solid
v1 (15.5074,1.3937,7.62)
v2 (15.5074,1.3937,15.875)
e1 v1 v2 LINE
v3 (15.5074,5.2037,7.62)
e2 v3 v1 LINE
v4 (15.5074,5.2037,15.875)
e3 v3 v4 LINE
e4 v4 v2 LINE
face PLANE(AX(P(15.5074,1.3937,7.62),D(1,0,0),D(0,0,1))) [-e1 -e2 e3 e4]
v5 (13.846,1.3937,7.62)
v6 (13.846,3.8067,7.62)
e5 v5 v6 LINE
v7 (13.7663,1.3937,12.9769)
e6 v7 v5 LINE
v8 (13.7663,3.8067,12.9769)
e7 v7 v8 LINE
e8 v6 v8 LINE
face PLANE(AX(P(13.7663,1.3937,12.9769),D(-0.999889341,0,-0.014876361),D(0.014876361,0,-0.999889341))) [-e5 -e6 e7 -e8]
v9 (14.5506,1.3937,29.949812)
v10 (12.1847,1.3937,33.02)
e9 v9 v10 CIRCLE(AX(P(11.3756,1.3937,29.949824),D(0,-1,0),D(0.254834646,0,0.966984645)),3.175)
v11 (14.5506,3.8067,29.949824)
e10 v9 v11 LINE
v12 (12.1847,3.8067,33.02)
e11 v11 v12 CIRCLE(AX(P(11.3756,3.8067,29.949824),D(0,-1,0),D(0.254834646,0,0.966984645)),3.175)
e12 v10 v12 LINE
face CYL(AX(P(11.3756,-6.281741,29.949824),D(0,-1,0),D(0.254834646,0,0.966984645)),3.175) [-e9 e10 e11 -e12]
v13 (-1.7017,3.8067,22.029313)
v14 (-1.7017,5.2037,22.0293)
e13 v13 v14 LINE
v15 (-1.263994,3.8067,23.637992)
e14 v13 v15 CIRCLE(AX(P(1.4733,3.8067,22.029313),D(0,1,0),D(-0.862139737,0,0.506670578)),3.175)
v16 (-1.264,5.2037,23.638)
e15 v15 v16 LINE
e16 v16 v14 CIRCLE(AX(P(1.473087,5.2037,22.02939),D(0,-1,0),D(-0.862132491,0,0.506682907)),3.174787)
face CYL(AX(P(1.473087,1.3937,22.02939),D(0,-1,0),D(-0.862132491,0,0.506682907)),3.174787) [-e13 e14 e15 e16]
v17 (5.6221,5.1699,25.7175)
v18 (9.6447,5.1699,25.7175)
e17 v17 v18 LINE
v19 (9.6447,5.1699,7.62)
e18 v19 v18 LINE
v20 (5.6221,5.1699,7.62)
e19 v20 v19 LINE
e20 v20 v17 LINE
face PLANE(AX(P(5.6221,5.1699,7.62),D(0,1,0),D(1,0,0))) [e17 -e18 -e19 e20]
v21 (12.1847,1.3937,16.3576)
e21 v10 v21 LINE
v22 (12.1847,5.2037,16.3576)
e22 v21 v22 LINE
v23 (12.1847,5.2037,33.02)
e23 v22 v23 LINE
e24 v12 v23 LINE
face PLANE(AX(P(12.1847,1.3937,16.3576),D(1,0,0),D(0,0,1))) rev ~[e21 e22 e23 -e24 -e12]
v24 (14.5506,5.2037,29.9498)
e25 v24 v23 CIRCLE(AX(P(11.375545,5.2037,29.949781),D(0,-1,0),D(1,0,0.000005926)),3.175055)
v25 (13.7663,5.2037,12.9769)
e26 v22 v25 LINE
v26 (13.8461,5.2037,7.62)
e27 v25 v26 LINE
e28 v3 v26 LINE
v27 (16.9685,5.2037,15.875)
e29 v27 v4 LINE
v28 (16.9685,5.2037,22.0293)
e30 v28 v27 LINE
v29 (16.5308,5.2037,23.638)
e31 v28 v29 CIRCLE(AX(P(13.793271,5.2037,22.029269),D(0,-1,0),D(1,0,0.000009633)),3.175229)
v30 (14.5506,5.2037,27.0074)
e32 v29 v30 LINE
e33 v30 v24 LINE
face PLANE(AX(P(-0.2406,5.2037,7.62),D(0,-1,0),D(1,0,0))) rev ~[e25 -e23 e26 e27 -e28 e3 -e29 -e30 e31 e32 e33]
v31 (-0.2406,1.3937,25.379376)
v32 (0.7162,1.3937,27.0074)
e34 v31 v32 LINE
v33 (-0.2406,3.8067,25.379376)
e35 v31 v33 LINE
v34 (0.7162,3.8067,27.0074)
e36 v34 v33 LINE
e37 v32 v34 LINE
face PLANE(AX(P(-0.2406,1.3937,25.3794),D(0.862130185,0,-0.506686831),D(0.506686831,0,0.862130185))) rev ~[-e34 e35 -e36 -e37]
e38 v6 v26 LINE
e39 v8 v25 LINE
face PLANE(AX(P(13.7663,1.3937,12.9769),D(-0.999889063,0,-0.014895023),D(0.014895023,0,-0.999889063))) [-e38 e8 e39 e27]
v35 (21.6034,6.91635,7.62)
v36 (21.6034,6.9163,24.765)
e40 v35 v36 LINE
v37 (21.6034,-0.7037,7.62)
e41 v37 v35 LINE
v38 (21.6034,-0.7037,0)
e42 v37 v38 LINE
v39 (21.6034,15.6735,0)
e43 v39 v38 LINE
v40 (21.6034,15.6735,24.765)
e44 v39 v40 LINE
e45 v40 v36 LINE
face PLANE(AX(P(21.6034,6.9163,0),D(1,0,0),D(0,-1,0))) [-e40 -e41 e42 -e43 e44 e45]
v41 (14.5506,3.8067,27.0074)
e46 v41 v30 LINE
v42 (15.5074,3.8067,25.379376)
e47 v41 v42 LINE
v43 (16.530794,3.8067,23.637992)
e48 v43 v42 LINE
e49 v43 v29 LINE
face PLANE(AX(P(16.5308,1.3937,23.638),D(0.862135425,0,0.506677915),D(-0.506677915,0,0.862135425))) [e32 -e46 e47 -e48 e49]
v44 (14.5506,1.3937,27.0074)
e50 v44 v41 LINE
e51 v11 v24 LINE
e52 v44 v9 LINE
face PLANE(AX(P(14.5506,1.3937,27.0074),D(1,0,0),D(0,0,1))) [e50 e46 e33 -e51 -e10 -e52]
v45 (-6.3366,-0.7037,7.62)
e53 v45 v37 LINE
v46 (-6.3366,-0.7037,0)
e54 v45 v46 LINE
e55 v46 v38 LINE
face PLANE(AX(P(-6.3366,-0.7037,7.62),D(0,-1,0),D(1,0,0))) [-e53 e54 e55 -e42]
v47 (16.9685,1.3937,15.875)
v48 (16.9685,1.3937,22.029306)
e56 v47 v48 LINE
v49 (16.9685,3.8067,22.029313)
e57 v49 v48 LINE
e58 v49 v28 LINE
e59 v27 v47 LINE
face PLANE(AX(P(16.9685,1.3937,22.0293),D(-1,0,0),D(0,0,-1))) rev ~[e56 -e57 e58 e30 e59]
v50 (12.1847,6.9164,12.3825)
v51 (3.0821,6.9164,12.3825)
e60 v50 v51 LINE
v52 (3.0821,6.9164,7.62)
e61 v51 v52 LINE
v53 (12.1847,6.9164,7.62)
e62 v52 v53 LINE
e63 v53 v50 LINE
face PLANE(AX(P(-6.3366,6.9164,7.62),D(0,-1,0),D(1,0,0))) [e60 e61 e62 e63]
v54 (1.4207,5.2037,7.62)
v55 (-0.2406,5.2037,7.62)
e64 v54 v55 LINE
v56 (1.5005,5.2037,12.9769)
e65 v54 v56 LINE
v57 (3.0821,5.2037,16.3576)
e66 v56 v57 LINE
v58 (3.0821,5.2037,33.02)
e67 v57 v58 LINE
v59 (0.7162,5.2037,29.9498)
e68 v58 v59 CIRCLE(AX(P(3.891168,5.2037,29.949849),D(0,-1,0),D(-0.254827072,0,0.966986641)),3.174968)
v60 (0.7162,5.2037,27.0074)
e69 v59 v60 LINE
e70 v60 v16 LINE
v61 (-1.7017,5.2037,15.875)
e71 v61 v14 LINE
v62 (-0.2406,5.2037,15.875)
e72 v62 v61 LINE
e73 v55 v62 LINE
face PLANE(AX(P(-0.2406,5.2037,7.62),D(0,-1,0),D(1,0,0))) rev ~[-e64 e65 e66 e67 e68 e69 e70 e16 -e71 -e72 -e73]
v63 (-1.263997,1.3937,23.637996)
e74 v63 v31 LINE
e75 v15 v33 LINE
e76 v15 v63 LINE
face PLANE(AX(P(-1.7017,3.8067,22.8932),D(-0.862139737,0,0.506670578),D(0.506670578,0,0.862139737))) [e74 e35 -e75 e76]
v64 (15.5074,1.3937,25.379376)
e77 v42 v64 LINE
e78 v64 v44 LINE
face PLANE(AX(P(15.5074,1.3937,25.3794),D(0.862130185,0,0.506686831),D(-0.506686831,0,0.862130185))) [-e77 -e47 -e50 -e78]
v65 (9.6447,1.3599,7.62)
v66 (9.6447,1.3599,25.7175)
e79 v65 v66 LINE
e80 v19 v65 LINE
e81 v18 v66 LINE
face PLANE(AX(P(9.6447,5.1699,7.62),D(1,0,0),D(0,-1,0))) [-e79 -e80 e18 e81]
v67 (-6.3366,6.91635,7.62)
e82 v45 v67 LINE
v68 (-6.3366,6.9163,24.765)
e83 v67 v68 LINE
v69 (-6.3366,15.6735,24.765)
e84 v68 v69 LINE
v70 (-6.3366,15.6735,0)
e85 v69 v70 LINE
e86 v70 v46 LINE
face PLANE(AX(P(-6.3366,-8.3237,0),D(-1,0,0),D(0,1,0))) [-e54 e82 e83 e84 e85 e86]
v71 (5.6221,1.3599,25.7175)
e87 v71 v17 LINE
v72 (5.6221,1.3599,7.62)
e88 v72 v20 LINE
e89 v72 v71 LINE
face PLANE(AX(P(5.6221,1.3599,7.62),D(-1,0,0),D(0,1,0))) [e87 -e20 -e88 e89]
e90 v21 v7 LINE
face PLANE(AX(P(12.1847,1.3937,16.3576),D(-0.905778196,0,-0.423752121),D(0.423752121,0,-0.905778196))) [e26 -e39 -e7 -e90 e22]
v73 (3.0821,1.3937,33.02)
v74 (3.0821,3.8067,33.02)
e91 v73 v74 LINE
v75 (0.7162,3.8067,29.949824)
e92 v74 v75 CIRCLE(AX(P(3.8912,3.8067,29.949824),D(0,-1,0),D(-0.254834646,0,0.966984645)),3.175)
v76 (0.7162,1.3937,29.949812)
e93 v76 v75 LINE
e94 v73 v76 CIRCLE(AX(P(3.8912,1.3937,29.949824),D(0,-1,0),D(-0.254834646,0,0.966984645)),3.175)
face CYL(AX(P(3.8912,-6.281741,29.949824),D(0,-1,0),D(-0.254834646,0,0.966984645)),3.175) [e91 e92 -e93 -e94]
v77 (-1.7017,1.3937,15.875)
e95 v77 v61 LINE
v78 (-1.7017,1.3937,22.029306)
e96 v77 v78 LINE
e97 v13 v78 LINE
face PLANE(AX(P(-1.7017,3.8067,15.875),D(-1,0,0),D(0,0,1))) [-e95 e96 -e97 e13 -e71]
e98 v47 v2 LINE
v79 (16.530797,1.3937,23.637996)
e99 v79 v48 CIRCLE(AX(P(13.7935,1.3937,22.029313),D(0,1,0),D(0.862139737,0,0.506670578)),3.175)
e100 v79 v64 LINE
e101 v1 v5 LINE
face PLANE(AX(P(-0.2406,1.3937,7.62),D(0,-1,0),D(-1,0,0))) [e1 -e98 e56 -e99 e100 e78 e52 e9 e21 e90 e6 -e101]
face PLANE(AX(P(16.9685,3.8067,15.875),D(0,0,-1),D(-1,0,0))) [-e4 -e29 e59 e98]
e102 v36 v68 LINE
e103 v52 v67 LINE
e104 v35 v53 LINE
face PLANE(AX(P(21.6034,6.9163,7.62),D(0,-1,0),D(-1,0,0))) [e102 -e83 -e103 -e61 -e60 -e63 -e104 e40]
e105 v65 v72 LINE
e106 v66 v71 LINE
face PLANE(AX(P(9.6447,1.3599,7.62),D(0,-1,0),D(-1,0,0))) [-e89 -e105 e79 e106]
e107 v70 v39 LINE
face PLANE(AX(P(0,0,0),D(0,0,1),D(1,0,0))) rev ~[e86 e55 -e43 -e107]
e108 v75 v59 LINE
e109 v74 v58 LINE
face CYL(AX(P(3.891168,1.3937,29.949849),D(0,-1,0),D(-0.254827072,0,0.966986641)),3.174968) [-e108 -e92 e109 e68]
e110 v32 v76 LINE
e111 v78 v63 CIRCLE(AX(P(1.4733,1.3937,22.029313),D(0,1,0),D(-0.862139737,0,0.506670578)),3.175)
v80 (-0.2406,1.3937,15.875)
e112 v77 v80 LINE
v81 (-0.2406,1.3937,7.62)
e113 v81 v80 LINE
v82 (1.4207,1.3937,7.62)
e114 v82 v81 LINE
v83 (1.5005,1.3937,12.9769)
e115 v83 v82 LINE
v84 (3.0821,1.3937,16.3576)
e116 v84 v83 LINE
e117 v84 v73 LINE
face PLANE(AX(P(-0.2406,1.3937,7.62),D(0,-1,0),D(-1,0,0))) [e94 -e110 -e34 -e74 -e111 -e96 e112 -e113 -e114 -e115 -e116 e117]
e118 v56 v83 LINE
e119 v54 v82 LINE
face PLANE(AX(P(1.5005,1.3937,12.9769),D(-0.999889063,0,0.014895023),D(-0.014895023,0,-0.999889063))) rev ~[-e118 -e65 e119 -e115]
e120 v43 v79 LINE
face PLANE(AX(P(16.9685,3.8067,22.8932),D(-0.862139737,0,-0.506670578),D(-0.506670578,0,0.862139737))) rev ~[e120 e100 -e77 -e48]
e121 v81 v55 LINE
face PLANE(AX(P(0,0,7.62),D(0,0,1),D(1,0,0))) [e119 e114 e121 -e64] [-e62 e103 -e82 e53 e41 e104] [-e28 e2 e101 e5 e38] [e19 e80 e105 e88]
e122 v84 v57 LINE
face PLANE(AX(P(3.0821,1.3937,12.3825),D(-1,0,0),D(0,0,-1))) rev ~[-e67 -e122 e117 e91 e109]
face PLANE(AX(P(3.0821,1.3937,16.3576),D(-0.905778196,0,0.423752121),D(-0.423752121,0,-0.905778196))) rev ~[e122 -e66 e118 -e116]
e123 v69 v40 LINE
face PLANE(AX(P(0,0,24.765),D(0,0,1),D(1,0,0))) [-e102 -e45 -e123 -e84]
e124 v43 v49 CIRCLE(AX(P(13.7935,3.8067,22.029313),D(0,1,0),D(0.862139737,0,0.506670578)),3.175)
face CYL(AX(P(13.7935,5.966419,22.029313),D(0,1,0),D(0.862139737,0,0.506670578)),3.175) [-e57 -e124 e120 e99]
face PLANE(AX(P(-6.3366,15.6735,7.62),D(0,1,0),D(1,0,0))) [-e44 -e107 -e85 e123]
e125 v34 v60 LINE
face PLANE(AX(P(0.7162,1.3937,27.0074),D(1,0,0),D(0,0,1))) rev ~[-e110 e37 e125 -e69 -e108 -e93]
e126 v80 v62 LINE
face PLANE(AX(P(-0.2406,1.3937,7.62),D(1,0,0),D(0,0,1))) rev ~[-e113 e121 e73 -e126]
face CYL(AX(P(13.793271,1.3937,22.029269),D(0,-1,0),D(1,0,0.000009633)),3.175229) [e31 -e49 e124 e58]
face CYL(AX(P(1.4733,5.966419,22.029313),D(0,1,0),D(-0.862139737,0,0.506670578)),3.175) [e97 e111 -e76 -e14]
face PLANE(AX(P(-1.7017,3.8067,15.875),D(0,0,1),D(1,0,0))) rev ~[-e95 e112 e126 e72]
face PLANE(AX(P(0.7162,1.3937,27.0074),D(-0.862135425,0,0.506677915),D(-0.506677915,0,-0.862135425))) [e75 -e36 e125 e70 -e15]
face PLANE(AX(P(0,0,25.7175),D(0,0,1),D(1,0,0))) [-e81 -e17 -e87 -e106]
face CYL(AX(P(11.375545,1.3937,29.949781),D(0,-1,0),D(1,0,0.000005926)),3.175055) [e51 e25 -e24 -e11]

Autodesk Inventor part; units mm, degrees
ref_plane "YZ Plane" through (0, 0, 0) normal (1, 0, 0) x (0, 1, 0)
ref_plane "XZ Plane" through (0, 0, 0) normal (0, 1, 0) x (-1, 0, 0)
ref_plane "XY Plane" through (0, 0, 0) normal (0, 0, 1) x (1, 0, 0)
sketch "Sketch1" plane through (0, 0, 0) normal (0, 0, 1) x (1, 0, 0)
  line L0 (-6.3366, 6.9163) -> (21.6034, 6.9163)
  line L1 (21.6034, 6.9163) -> (21.6034, -8.3237)
  line L2 (21.6034, -8.3237) -> (-6.3366, -8.3237)
  line L3 (-6.3366, -8.3237) -> (-6.3366, 6.9163)
  point P0 (0, 0)
  dimension "d0" = 27.94
  dimension "d1" = 15.24
extrude "Extrusion1" add sketch "Sketch1" along normal blind 7.62
sketch "Sketch2" plane through (0, 0, 7.62) normal (0, 0, 1) x (1, 0, 0)
  line L0 (-6.3366, 6.9163) -> (-6.3366, -8.3237) projected
  line L1 (21.6034, -8.3237) -> (21.6034, 6.9163) projected
  line L2 (21.6034, 1.3937) -> (21.6034, 3.8067)
  line L3 (-6.3366, 3.8067) -> (-6.3366, 1.3937)
  line L4 (21.6034, 6.9163) -> (-6.3366, 6.9163) projected
  line L5 (-6.3366, -8.3237) -> (21.6034, -8.3237) projected
  line L6 (0.9631, 3.8067) -> (-0.2406, 3.8067)
  line L7 (-0.2406, 1.3937) -> (0.9631, 1.3937)
  line L8 (-0.2406, 1.3937) -> (-0.2406, 3.8067)
  line L9 (-0.2406, 1.3937) -> (3.0821, 1.3937)
  line L10 (3.0821, 1.3937) -> (3.0821, 3.8067)
  line L11 (3.0821, 3.8067) -> (-0.2406, 3.8067)
  line L12 (-0.2406, 3.8067) -> (-0.2406, 1.3937)
  line L13 (14.3038, 3.8067) -> (15.5074, 3.8067)
  line L14 (15.5074, 1.3937) -> (14.3038, 1.3937)
  line L15 (15.5074, 1.3937) -> (15.5074, 3.8067)
  line L16 (15.5074, 1.3937) -> (12.1847, 1.3937)
  line L17 (12.1847, 1.3937) -> (12.1847, 3.8067)
  line L18 (12.1847, 3.8067) -> (15.5074, 3.8067)
  line L19 (15.5074, 3.8067) -> (15.5074, 1.3937)
  line L20 (-6.3366, -0.7037) -> (21.6034, -0.7037)
  line L21 (-6.3366, 3.8067) -> (21.6034, 3.8067)
  line L22 (21.6034, 3.8067) -> (21.6034, 1.3937)
  line L23 (21.6034, 1.3937) -> (-6.3366, 1.3937)
  line L24 (-6.3366, 1.3937) -> (-6.3366, 3.8067)
  point P0 (0, 0)
  point P1 (-0.2406, 2.6002)
  point P2 (15.2669, 1.0813)
  point P3 (15.5074, 2.6002)
  point P4 (15.5074, 1.3937)
  point P5 (21.6034, 3.8067)
  point P6 (15.5074, 3.8067)
  point P7 (-0.2406, 1.3937)
  point P8 (-0.2406, 3.8067)
  point P9 (-6.3366, 3.8067)
  point P10 (3.0821, 1.3937)
  point P11 (12.1847, 1.3937)
  point P12 (12.1847, 3.8067)
  point P13 (3.0821, 3.8067)
  dimension "d6" = 6.096
extrude "Extrusion2" add sketch "Sketch2" along normal blind 8.7376 contours L6 L11 L10 L9 L7 L8 | L15 L14 L16 L17 L18 L13
sketch "Sketch3" plane through (-0.2406, 3.8067, 7.62) normal (0, 1, 0) x (1, 0, 0)
  line L0 (3.3227, -8.7376) -> (0, -8.7376) projected
  line L1 (-6.096, 7.62) -> (21.844, 7.62) projected
  line L2 (3.3227, -11.3552) -> (3.3227, -8.7376)
  line L3 (12.4253, -11.3552) -> (12.4253, -8.7376)
  line L4 (17.2091, -8.255) -> (17.2091, -15.2732)
  line L5 (17.2091, -15.2732) -> (14.9854, -19.057)
  line L6 (14.9854, -19.057) -> (12.4253, -19.057)
  line L7 (12.4253, -19.057) -> (12.4253, -8.7376)
  line L8 (7.874, 7.62) -> (7.874, -24.8322)
  line L9 (3.3227, -11.3552) -> (3.3227, -8.7376)
  line L10 (-1.4611, -8.255) -> (-1.4611, -15.2732)
  line L11 (-1.4611, -15.2732) -> (0.7626, -19.057)
  line L12 (0.7626, -19.057) -> (3.3227, -19.057)
  line L13 (3.3227, -19.057) -> (3.3227, -8.7376)
  line L14 (17.2091, -8.255) -> (12.4253, -8.255)
  line L15 (12.4253, 0) -> (12.4253, -8.7376) projected
  line L16 (12.4253, -8.255) -> (12.4253, -8.7376)
  line L17 (-1.4611, -8.255) -> (3.3227, -8.255)
  line L18 (3.3227, 0) -> (3.3227, -8.7376) projected
  line L19 (3.3227, -8.255) -> (3.3227, -8.7376)
  point P0 (0.2406, 7.62)
extrude "Extrusion4" add sketch "Sketch2" along normal blind 25.4 contours L6 L11 L10 L9 L7 L8 | L15 L14 L16 L17 L18 L13
sketch "Sketch4" plane through (-6.3366, 6.9163, 0) normal (0, 1, 0) x (1, 0, 0)
  point P0 (6.3366, 0)
sketch "Sketch5" plane through (0, 0, 7.62) normal (0, 0, 1) x (1, 0, 0)
  line L0 (21.6034, 6.9163) -> (-6.3366, 6.9163) projected
  line L1 (-6.3366, 15.6735) -> (21.6034, 15.6735)
  line L2 (21.6034, 15.6735) -> (21.6034, 6.9163)
  line L3 (21.6034, 6.9163) -> (-6.3366, 6.9163)
  line L4 (-6.3366, 6.9163) -> (-6.3366, 15.6735)
  point P0 (0, 0)
extrude "Extrusion5" add sketch "Sketch5" along normal blind 17.145 and the other way blind 7.62
extrude "Extrusion6" cut sketch "Sketch2" against normal blind 25.4 contours L20 L1 L5 L0
extrude "Extrusion7" add sketch "Sketch2" along normal blind 4.7625 contours L21 L8 L23 L0 | L1 L23 L15 L21 | L21 L17 L23 L10
extrude "Extrusion8" add sketch "Sketch3" against normal up to surface (2.413 mm away)
sketch "Sketch6" plane through (-6.3366, 1.3937, 7.62) normal (0, -1, 0) x (1, 0, 0)
  line L0 (27.94, 0) -> (27.94, 4.7625) projected
  line L1 (21.844, 4.7625) -> (21.844, 8.255) projected
  line L2 (27.94, 0) -> (21.844, 0)
  line L3 (21.844, 0) -> (21.844, 4.7625)
  line L4 (21.844, 4.7625) -> (27.94, 4.7625)
  line L5 (27.94, 4.7625) -> (27.94, 0)
  line L6 (18.5213, 4.7625) -> (18.5213, 25.4) projected
  line L7 (18.5213, 4.7625) -> (9.4187, 4.7625)
  line L8 (9.4187, 4.7625) -> (9.4187, 0)
  line L9 (9.4187, 0) -> (18.5213, 0)
  line L10 (18.5213, 0) -> (18.5213, 4.7625)
  line L11 (6.096, 4.7625) -> (6.096, 8.255) projected
  line L12 (0, 0) -> (0, 4.7625) projected
  line L13 (6.096, 4.7625) -> (0, 4.7625)
  line L14 (0, 4.7625) -> (0, 0)
  line L15 (0, 0) -> (6.096, 0)
  line L16 (6.096, 0) -> (6.096, 4.7625)
  point P0 (6.3366, -7.62)
  point P1 (21.844, 8.7376)
  point P2 (18.5213, 19.057)
  point P3 (6.096, 8.7376)
extrude "Extrusion9" cut sketch "Sketch6" against normal up to surface (5.5227 mm away)
sketch "Sketch7" plane through (12.1847, 1.3937, 7.62) normal (0, -1, 0) x (1, 0, 0)
  line L0 (3.3227, 17.7594) -> (4.7838, 15.2732) projected
  line L1 (3.3227, 17.7594) -> (2.3659, 19.3874)
  line L2 (2.3659, 19.3874) -> (2.3659, 25.4)
  line L3 (3.3227, 25.4) -> (0, 25.4) projected
  line L4 (3.3227, 17.7594) -> (3.3227, 25.4) projected
  line L5 (2.3659, 25.4) -> (3.3227, 25.4)
  line L6 (3.3227, 25.4) -> (3.3227, 17.7594)
  line L7 (-18.5213, -7.62) -> (9.4187, -7.62) projected
  line L8 (-12.4253, 17.7594) -> (-11.4685, 19.3874)
  line L9 (-11.4685, 19.3874) -> (-11.4685, 25.4)
  line L10 (-12.4253, 17.7594) -> (-12.4253, 25.4)
  line L11 (-11.4685, 25.4) -> (-12.4253, 25.4)
  line L12 (-12.4253, 25.4) -> (-12.4253, 17.7594)
  line L13 (-12.4253, 8.7376) -> (-13.8865, 8.255) projected
  line L14 (-9.1825, 8.7376) -> (-9.1026, 8.7376)
  line L15 (-9.1026, 0) -> (-9.1026, 25.4) projected
  line L16 (-10.6842, 5.3569) -> (-10.764, 0)
  line L17 (-9.1026, 0) -> (-12.4253, 0) projected
  line L18 (-9.1026, 0) -> (-9.1026, 8.7376)
  line L19 (-10.764, 0) -> (-9.1026, 0)
  line L20 (9.4187, -7.62) -> (-18.5213, -7.62) projected
  line L21 (-18.5213, 17.145) -> (9.4187, 17.145) projected
  line L22 (1.5816, 5.3569) -> (1.6613, 0)
  line L23 (1.6613, 0) -> (0, 0)
  line L24 (0, 0) -> (0, 8.7376)
  line L25 (-4.5513, -7.62) -> (-4.5513, 0)
  line L26 (-4.5513, 11.274) -> (-4.5513, 11.3382)
  line L27 (-9.1026, 8.7376) -> (-10.6842, 5.3569)
  line L28 (0, 8.7376) -> (1.5816, 5.3569)
  point P0 (-12.1847, -7.62)
extrude "Extrusion10" cut sketch "Sketch7" against normal up to surface (5.5227 mm away)
fillet "Fillet1" radius 3.175 4 edges at (0.7162, 2.6002, 33.02) (14.5507, 2.6002, 33.02) (16.9686, 2.6002, 22.8932) (-1.7017, 2.6002, 22.8932)
sketch "Sketch8" plane through (-0.2406, 1.3937, 7.62) normal (0, -1, 0) x (1, 0, 0)
  arc A0 (-1.0234, 16.018) -> (-1.4611, 14.4093) centre (1.7139, 14.4093) ccw projected
  line L0 (-1.4611, 8.255) -> (-1.4611, 14.4093) projected
  line L1 (0, 0) -> (0, 8.255) projected
  line L2 (1.6613, 0) -> (0, 0) projected
  line L3 (1.6613, 0) -> (1.7411, 5.3569) projected
  line L4 (1.7411, 5.3569) -> (3.3227, 8.7376) projected
  line L5 (3.3227, 8.7376) -> (3.3227, 25.4) projected
  arc A1 (3.3227, 25.4) -> (0.9568, 22.3298) centre (4.1318, 22.3298) ccw projected
  line L6 (0.9568, 22.3298) -> (0.9568, 19.3874) projected
  line L7 (0.9568, 19.3874) -> (-1.0234, 16.018) projected
  arc A2 (17.2091, 14.4093) -> (16.7714, 16.018) centre (14.0341, 14.4093) ccw projected
  line L8 (16.7714, 16.018) -> (14.7912, 19.3874) projected
  line L9 (14.7912, 19.3874) -> (14.7912, 22.3298) projected
  arc A3 (14.7912, 22.3298) -> (12.4253, 25.4) centre (11.6162, 22.3298) ccw projected
  line L10 (12.4253, 8.7376) -> (12.4253, 25.4) projected
  line L11 (12.4253, 8.7376) -> (14.0069, 5.3569) projected
  line L12 (14.0069, 5.3569) -> (14.0867, 0) projected
  line L13 (15.748, 0) -> (14.0867, 0) projected
  line L14 (15.748, 0) -> (15.748, 8.255) projected
  line L15 (17.2091, 14.4093) -> (17.2091, 8.255) projected
  line L16 (17.2091, 8.255) -> (15.748, 8.255) projected
  line L17 (0, 8.255) -> (-1.4611, 8.255) projected
  point P0 (0.2406, -7.62)
extrude "Extrusion11" add sketch "Sketch8" against normal blind 3.81
sketch "Sketch9" plane through (0, 0, 7.62) normal (0, 0, 1) x (1, 0, 0)
  line L0 (9.6447, 1.3599) -> (5.6221, 1.3599)
  line L1 (5.6221, 1.3599) -> (5.6221, 5.1699)
  line L2 (5.6221, 5.1699) -> (9.6447, 5.1699)
  line L3 (9.6447, 5.1699) -> (9.6447, 1.3599)
  line L4 (12.1847, 1.3937) -> (12.1847, 5.2037) projected
  line L5 (3.0821, 1.3937) -> (3.0821, 5.2037) projected
  line L6 (1.4208, 1.3937) -> (1.4208, 5.2037) projected
  point P0 (0, 0)
  dimension "d30" = 2.54
  dimension "d31" = 2.54
extrude "Extrusion12" add sketch "Sketch9" along normal blind 18.0975
properties part number "Attachment4"
